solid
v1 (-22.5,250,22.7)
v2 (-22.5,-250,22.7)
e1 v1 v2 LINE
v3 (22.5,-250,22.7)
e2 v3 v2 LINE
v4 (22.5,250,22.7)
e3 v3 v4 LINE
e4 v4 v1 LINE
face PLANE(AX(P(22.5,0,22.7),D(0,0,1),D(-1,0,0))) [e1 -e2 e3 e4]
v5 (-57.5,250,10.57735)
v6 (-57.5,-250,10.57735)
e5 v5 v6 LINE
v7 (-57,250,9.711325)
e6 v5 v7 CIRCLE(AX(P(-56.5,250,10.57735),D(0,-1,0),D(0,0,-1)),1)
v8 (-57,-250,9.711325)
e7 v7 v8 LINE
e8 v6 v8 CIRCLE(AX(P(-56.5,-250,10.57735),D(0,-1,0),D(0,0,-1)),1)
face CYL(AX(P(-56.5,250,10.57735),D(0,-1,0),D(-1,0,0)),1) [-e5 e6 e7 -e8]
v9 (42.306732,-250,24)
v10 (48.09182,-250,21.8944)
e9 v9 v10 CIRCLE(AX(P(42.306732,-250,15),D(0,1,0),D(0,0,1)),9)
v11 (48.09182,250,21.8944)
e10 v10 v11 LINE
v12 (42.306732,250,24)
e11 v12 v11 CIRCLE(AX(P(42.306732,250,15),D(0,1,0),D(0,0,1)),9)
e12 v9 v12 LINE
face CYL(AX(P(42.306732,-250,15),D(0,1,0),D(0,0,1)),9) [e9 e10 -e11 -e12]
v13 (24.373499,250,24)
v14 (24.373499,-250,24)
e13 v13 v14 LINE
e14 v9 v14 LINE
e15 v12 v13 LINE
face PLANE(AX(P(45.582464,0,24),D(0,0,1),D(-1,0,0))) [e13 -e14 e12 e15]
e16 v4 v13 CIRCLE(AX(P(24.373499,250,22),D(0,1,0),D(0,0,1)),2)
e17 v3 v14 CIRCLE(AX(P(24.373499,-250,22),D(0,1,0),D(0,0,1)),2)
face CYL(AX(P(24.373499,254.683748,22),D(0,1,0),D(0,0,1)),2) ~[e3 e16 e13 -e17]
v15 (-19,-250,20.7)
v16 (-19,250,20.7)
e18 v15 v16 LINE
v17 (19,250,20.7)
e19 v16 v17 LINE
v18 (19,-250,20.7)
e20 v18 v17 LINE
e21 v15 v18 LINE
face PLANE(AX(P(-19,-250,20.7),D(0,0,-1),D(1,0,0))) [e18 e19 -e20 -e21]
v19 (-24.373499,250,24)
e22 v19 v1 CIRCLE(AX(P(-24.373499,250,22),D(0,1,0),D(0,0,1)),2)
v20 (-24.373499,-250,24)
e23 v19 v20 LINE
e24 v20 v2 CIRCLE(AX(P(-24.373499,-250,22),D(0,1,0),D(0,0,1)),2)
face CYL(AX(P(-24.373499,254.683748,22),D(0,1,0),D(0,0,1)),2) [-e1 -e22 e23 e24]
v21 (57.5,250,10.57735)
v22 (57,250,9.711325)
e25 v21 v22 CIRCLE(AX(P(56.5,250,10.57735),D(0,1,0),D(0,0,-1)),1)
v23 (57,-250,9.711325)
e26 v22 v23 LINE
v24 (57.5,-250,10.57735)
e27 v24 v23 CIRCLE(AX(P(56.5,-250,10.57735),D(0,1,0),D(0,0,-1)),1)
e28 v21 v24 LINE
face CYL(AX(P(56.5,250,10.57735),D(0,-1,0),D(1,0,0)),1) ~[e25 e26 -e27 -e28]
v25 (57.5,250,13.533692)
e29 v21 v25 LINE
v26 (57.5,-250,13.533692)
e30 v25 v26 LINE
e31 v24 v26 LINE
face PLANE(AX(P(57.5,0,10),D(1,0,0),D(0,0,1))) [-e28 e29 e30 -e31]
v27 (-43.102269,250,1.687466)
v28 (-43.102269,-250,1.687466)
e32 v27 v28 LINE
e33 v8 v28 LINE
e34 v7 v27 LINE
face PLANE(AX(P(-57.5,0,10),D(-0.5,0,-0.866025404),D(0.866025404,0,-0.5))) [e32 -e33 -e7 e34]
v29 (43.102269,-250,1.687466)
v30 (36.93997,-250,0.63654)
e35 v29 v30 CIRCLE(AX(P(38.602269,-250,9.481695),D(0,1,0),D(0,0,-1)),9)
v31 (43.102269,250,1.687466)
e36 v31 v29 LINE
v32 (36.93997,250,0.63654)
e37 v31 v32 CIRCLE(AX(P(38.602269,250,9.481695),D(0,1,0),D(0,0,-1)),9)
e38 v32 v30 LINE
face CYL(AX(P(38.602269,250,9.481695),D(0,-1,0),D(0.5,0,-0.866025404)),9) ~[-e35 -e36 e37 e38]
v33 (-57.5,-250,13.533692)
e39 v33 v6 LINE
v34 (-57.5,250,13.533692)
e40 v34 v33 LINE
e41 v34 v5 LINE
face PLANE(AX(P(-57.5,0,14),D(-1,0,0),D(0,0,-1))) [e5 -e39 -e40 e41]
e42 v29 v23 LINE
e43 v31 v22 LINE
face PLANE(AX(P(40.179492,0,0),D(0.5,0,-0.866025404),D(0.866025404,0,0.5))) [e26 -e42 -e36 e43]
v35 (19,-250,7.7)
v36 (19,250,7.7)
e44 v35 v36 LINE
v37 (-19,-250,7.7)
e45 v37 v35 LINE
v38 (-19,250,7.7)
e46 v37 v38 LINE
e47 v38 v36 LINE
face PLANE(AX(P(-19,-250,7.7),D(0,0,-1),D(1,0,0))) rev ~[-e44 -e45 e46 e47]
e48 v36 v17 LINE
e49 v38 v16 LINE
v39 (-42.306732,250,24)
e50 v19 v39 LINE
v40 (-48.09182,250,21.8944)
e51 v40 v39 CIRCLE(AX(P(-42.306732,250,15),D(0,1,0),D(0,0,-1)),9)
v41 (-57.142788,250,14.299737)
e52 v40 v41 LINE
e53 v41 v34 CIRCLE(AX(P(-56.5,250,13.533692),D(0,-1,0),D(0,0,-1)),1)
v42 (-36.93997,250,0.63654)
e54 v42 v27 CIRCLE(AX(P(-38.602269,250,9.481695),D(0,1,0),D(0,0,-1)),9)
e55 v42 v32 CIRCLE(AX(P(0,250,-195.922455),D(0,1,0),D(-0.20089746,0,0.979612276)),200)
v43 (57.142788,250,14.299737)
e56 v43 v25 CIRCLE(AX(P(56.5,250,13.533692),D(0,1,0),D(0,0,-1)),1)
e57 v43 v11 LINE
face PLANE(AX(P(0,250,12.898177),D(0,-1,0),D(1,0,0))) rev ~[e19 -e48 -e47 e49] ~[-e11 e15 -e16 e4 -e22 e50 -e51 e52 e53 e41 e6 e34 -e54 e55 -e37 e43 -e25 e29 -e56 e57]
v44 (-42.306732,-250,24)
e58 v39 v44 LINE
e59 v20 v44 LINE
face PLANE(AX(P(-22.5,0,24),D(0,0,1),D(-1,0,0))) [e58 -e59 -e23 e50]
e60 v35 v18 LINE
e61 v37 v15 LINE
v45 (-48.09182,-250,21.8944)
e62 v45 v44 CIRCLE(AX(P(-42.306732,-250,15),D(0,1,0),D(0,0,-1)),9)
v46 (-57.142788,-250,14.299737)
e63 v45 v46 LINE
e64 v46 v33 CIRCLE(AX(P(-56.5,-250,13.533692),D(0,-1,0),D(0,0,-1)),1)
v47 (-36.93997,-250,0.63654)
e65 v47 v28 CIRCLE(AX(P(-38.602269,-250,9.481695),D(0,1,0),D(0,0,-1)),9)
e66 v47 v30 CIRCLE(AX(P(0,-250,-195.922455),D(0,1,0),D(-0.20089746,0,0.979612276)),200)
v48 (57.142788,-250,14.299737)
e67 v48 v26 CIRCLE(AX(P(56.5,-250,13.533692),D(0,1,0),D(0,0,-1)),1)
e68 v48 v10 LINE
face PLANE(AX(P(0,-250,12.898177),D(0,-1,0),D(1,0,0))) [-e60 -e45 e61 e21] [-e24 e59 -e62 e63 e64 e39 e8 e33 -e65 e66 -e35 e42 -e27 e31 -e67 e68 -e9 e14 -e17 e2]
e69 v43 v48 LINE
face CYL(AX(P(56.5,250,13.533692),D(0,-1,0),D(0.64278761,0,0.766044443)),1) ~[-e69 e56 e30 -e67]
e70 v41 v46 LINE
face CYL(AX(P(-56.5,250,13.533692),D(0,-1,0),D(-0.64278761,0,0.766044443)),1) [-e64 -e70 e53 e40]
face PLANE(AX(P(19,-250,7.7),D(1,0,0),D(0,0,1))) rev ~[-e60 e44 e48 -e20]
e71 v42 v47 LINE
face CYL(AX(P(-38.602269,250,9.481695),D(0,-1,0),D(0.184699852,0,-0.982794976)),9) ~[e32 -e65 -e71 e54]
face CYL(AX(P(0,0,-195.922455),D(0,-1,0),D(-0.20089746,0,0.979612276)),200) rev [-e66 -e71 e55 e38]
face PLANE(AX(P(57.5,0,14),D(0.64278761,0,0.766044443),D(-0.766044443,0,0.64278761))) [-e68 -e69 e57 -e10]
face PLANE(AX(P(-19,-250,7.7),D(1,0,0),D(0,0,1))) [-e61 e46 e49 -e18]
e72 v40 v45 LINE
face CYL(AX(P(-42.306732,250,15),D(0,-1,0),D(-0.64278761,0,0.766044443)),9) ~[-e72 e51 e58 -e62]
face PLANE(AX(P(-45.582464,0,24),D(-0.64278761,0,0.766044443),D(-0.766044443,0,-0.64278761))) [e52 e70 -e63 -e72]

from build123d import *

# Parameters (mm, degrees)
F1_DEPTH    = 250
F2_W        = 38
F2_H        = 13
F3_DEPTH    = 500.001
F4_T1_DEPTH = 509.3674969976
F5_R        = 9
F6_R        = 1


# Not quite as in the source:
# - a fillet or chamfer that OpenCascade refuses, or shapes differently, is made with other operations: its cross-section is extruded or revolved along the edge and cut away or added


with BuildPart() as f1:
    # F0 (on Front) → F1 (new body, symmetric)
    with BuildSketch(Plane.XZ):
        with BuildLine():
            Line((22.5, 22.7), (0, 22.7))
            Line((0, 22.7), (-22.5, 22.7))
            Line((-22.5, 22.7), (-22.5, 24))
            Line((-22.5, 24), (-45.5824640741, 24))
            Line((-45.5824640741, 24), (-57.5, 14))
            Line((-57.5, 14), (-57.5, 10))
            Line((-57.5, 10), (-40.1794919243, 0))
            ThreePointArc((-40.1794919243, 0), (0, 4.0775448584), (40.1794919243, 0))
            Line((40.1794919243, 0), (57.5, 10))
            Line((57.5, 10), (57.5, 14))
            Line((57.5, 14), (45.5824640741, 24))
            Line((45.5824640741, 24), (22.5, 24))
            Line((22.5, 24), (22.5, 22.7))
        make_face()
    extrude(amount=F1_DEPTH, both=True)

    # F2 (on face) → F3 (cut, through all)
    with BuildSketch(Plane.XZ.offset(250)):
        with Locations((0, 14.2)):
            Rectangle(F2_W, F2_H)
    extrude(amount=-F3_DEPTH, mode=Mode.SUBTRACT)

    # F4: fillet of radius 2 on 2 edges, made by hand

    # F4_s2 → F4_t1 (cut)
    with BuildSketch(Plane.XZ.offset(-254.6837484988)):
        with BuildLine():
            ThreePointArc((-24.3734993995, 24), (-23.2333239744, 23.6431676725), (-22.5, 22.7))
            Line((-22.5, 22.7), (-22.5, 24))
            Line((-22.5, 24), (-24.3734993995, 24))
        make_face()
        with BuildLine():
            ThreePointArc((24.3734993995, 24), (23.2333239744, 23.6431676725), (22.5, 22.7))
            Line((22.5, 22.7), (22.5, 24))
            Line((22.5, 24), (24.3734993995, 24))
        make_face()
    extrude(amount=F4_T1_DEPTH, mode=Mode.SUBTRACT)

    # F5
    f5_edges = [f1.edges().sort_by_distance(p)[0] for p in [
        (-45.582464, 0, 24),
        (45.582464, 0, 24),
        (-40.179492, 0, 0),
        (40.179492, 0, 0),
    ]]
    fillet(f5_edges, radius=F5_R)

    # F6
    f6_edges = [f1.edges().sort_by_distance(p)[0] for p in [
        (42.306732, 0, 24),
        (57.5, 0, 14),
        (57.5, 0, 10),
        (-57.5, 0, 10),
        (-57.5, 0, 14),
    ]]
    fillet(f6_edges, radius=F6_R)


solid = f1.part
